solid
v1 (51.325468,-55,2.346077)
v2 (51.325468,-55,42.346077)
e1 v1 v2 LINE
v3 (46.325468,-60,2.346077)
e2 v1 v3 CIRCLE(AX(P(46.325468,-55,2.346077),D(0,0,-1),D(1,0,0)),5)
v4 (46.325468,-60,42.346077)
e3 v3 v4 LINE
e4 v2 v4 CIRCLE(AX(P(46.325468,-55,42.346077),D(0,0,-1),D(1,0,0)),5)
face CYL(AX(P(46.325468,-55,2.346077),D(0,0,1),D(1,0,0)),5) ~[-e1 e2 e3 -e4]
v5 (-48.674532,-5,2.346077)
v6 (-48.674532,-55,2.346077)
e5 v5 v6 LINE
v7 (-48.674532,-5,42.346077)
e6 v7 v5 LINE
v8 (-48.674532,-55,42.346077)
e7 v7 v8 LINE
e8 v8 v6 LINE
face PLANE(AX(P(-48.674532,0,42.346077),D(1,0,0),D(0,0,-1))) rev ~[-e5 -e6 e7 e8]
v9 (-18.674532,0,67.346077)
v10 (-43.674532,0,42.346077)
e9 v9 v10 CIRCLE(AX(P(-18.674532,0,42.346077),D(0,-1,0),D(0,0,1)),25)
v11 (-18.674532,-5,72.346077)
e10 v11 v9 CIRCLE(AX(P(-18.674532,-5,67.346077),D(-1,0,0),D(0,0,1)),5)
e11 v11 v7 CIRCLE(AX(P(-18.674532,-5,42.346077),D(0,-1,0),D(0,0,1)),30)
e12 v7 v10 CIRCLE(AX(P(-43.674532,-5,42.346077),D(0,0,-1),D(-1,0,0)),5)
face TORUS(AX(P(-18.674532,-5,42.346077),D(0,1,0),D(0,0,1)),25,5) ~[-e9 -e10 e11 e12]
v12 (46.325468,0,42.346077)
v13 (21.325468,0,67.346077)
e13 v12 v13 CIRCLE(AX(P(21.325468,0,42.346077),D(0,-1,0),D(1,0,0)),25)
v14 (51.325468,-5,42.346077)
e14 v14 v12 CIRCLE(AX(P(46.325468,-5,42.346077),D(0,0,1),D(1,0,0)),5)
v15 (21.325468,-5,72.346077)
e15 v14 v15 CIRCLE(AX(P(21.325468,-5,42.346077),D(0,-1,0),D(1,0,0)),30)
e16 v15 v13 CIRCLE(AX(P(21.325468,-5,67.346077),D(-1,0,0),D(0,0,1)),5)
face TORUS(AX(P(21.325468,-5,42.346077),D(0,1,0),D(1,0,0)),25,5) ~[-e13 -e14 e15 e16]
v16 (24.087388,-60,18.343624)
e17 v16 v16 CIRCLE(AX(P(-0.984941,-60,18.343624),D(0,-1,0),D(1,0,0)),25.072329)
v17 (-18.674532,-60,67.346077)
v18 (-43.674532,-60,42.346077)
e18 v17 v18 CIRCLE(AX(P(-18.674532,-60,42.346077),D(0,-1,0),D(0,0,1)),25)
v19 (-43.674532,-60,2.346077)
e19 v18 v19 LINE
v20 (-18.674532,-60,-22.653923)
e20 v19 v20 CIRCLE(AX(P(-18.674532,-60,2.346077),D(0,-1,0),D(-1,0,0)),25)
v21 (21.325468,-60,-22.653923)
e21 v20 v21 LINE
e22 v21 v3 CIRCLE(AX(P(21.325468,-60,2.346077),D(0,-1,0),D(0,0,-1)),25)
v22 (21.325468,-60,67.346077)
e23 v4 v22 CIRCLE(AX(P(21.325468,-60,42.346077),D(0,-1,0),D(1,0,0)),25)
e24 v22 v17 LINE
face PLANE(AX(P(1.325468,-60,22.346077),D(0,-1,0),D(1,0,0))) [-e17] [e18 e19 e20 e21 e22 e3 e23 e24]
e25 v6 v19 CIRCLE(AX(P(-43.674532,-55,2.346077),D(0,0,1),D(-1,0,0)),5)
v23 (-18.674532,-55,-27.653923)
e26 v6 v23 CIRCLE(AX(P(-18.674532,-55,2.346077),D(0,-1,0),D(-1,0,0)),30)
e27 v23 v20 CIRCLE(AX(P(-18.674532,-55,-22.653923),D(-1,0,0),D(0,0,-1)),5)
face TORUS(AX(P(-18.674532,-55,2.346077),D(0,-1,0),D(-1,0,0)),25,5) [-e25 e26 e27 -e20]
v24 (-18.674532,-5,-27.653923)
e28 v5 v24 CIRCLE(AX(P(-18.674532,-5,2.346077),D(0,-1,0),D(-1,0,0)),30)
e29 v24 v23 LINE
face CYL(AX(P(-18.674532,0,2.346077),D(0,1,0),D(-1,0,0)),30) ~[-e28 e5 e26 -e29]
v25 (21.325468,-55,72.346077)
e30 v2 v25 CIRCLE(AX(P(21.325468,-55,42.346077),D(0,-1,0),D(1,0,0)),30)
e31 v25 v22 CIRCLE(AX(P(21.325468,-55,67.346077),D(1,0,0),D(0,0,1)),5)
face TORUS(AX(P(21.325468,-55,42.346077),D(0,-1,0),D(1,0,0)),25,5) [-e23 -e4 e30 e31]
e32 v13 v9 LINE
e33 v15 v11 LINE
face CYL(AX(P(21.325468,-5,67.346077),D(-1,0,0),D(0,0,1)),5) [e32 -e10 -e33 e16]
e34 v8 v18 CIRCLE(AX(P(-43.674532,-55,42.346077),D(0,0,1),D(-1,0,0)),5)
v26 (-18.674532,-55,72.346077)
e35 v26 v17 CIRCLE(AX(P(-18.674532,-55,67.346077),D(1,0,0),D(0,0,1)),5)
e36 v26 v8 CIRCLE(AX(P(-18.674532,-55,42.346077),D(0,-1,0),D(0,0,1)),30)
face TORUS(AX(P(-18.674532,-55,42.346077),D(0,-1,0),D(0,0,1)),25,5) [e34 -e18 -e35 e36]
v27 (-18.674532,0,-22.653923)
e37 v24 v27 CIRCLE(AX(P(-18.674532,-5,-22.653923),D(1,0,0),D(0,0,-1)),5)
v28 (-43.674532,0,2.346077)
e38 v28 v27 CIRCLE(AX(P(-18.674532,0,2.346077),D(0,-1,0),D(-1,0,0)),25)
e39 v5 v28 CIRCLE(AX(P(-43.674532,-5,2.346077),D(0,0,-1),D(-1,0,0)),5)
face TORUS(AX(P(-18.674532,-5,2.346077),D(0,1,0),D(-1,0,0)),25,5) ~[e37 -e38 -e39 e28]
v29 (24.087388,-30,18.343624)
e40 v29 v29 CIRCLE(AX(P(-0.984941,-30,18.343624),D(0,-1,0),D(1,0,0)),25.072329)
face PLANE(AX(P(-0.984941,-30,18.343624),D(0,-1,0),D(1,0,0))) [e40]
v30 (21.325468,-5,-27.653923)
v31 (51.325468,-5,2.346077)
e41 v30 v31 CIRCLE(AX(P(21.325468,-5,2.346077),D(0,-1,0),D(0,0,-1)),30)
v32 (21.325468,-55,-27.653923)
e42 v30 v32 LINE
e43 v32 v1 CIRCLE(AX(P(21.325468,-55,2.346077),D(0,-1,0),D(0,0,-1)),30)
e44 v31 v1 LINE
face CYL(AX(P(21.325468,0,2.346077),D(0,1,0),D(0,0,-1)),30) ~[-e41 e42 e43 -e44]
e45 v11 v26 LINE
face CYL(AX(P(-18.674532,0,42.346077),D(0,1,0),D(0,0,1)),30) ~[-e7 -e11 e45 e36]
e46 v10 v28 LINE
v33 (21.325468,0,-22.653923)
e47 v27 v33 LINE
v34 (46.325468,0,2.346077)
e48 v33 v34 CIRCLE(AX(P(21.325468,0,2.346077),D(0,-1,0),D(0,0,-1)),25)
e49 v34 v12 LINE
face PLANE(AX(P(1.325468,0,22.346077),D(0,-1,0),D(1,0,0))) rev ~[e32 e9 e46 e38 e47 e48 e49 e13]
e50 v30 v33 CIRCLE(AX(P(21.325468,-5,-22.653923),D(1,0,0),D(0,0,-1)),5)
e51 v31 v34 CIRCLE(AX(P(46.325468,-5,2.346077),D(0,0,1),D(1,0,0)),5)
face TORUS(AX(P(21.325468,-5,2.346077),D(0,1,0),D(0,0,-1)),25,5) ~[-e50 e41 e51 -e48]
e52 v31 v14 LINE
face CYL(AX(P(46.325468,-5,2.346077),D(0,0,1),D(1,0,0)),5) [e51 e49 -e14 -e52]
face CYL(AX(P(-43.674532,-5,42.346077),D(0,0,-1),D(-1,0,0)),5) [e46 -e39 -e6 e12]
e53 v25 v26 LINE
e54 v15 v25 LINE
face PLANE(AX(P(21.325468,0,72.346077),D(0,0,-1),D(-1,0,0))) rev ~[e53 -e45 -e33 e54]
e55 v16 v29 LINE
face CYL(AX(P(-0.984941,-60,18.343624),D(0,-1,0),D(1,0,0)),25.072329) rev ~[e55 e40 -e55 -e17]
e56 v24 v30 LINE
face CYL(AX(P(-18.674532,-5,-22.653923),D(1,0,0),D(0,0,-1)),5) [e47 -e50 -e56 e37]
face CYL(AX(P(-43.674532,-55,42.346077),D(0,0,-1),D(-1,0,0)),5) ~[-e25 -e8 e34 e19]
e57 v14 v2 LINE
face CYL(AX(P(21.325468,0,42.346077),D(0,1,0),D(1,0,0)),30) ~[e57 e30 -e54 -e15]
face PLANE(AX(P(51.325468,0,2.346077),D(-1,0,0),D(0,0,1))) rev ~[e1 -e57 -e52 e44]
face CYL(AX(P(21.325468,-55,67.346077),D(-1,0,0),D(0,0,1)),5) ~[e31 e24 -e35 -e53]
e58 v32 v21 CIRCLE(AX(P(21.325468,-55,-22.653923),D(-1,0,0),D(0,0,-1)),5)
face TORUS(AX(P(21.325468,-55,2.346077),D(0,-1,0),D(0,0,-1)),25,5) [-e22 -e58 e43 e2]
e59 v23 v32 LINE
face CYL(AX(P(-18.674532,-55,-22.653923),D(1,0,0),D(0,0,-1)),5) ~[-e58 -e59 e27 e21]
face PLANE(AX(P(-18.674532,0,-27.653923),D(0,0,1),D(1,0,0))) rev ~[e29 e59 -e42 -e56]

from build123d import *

# Parameters (mm, degrees)
F1_DEPTH = 60
F2_R     = 5
F3_R     = 25.0723290406
F4_DEPTH = 30


# Not quite as in the source:
# - a feature names something its author has since deleted; it is built from what else it names


with BuildPart() as f1:
    # F0 (on Front) → F1 (new body)
    with BuildSketch(Plane.XZ):
        with BuildLine():
            Line((21.3254676014, 72.3460770576), (-18.6745323986, 72.3460770576))
            ThreePointArc((-18.6745323986, 72.3460770576), (-39.8877358342, 63.5592804932), (-48.6745323986, 42.3460770576))
            Line((-48.6745323986, 42.3460770576), (-48.6745323986, 2.3460770576))
            ThreePointArc((-48.6745323986, 2.3460770576), (-39.8877358342, -18.867126378), (-18.6745323986, -27.6539229424))
            Line((-18.6745323986, -27.6539229424), (21.3254676014, -27.6539229424))
            ThreePointArc((21.3254676014, -27.6539229424), (42.538671037, -18.867126378), (51.3254676014, 2.3460770576))
            Line((51.3254676014, 2.3460770576), (51.3254676014, 42.3460770576))
            ThreePointArc((51.3254676014, 42.3460770576), (42.538671037, 63.5592804932), (21.3254676014, 72.3460770576))
        make_face()
    extrude(amount=F1_DEPTH)

    # F2
    f2_edges = [f1.edges().sort_by_distance(p)[0] for p in [
        (51.325468, -30, 42.346077),
        (21.325468, -30, 72.346077),
        (42.538671, 0, 63.55928),
        (42.538671, -60, 63.55928),
    ]]
    fillet(f2_edges, radius=F2_R)

    # F3 (on face) → F4 (cut)
    with BuildSketch(Plane.XZ.offset(60)):
        with Locations((-0.98494126, 18.3436237276)):
            Circle(F3_R)
    extrude(amount=-F4_DEPTH, mode=Mode.SUBTRACT)


solid = f1.part
